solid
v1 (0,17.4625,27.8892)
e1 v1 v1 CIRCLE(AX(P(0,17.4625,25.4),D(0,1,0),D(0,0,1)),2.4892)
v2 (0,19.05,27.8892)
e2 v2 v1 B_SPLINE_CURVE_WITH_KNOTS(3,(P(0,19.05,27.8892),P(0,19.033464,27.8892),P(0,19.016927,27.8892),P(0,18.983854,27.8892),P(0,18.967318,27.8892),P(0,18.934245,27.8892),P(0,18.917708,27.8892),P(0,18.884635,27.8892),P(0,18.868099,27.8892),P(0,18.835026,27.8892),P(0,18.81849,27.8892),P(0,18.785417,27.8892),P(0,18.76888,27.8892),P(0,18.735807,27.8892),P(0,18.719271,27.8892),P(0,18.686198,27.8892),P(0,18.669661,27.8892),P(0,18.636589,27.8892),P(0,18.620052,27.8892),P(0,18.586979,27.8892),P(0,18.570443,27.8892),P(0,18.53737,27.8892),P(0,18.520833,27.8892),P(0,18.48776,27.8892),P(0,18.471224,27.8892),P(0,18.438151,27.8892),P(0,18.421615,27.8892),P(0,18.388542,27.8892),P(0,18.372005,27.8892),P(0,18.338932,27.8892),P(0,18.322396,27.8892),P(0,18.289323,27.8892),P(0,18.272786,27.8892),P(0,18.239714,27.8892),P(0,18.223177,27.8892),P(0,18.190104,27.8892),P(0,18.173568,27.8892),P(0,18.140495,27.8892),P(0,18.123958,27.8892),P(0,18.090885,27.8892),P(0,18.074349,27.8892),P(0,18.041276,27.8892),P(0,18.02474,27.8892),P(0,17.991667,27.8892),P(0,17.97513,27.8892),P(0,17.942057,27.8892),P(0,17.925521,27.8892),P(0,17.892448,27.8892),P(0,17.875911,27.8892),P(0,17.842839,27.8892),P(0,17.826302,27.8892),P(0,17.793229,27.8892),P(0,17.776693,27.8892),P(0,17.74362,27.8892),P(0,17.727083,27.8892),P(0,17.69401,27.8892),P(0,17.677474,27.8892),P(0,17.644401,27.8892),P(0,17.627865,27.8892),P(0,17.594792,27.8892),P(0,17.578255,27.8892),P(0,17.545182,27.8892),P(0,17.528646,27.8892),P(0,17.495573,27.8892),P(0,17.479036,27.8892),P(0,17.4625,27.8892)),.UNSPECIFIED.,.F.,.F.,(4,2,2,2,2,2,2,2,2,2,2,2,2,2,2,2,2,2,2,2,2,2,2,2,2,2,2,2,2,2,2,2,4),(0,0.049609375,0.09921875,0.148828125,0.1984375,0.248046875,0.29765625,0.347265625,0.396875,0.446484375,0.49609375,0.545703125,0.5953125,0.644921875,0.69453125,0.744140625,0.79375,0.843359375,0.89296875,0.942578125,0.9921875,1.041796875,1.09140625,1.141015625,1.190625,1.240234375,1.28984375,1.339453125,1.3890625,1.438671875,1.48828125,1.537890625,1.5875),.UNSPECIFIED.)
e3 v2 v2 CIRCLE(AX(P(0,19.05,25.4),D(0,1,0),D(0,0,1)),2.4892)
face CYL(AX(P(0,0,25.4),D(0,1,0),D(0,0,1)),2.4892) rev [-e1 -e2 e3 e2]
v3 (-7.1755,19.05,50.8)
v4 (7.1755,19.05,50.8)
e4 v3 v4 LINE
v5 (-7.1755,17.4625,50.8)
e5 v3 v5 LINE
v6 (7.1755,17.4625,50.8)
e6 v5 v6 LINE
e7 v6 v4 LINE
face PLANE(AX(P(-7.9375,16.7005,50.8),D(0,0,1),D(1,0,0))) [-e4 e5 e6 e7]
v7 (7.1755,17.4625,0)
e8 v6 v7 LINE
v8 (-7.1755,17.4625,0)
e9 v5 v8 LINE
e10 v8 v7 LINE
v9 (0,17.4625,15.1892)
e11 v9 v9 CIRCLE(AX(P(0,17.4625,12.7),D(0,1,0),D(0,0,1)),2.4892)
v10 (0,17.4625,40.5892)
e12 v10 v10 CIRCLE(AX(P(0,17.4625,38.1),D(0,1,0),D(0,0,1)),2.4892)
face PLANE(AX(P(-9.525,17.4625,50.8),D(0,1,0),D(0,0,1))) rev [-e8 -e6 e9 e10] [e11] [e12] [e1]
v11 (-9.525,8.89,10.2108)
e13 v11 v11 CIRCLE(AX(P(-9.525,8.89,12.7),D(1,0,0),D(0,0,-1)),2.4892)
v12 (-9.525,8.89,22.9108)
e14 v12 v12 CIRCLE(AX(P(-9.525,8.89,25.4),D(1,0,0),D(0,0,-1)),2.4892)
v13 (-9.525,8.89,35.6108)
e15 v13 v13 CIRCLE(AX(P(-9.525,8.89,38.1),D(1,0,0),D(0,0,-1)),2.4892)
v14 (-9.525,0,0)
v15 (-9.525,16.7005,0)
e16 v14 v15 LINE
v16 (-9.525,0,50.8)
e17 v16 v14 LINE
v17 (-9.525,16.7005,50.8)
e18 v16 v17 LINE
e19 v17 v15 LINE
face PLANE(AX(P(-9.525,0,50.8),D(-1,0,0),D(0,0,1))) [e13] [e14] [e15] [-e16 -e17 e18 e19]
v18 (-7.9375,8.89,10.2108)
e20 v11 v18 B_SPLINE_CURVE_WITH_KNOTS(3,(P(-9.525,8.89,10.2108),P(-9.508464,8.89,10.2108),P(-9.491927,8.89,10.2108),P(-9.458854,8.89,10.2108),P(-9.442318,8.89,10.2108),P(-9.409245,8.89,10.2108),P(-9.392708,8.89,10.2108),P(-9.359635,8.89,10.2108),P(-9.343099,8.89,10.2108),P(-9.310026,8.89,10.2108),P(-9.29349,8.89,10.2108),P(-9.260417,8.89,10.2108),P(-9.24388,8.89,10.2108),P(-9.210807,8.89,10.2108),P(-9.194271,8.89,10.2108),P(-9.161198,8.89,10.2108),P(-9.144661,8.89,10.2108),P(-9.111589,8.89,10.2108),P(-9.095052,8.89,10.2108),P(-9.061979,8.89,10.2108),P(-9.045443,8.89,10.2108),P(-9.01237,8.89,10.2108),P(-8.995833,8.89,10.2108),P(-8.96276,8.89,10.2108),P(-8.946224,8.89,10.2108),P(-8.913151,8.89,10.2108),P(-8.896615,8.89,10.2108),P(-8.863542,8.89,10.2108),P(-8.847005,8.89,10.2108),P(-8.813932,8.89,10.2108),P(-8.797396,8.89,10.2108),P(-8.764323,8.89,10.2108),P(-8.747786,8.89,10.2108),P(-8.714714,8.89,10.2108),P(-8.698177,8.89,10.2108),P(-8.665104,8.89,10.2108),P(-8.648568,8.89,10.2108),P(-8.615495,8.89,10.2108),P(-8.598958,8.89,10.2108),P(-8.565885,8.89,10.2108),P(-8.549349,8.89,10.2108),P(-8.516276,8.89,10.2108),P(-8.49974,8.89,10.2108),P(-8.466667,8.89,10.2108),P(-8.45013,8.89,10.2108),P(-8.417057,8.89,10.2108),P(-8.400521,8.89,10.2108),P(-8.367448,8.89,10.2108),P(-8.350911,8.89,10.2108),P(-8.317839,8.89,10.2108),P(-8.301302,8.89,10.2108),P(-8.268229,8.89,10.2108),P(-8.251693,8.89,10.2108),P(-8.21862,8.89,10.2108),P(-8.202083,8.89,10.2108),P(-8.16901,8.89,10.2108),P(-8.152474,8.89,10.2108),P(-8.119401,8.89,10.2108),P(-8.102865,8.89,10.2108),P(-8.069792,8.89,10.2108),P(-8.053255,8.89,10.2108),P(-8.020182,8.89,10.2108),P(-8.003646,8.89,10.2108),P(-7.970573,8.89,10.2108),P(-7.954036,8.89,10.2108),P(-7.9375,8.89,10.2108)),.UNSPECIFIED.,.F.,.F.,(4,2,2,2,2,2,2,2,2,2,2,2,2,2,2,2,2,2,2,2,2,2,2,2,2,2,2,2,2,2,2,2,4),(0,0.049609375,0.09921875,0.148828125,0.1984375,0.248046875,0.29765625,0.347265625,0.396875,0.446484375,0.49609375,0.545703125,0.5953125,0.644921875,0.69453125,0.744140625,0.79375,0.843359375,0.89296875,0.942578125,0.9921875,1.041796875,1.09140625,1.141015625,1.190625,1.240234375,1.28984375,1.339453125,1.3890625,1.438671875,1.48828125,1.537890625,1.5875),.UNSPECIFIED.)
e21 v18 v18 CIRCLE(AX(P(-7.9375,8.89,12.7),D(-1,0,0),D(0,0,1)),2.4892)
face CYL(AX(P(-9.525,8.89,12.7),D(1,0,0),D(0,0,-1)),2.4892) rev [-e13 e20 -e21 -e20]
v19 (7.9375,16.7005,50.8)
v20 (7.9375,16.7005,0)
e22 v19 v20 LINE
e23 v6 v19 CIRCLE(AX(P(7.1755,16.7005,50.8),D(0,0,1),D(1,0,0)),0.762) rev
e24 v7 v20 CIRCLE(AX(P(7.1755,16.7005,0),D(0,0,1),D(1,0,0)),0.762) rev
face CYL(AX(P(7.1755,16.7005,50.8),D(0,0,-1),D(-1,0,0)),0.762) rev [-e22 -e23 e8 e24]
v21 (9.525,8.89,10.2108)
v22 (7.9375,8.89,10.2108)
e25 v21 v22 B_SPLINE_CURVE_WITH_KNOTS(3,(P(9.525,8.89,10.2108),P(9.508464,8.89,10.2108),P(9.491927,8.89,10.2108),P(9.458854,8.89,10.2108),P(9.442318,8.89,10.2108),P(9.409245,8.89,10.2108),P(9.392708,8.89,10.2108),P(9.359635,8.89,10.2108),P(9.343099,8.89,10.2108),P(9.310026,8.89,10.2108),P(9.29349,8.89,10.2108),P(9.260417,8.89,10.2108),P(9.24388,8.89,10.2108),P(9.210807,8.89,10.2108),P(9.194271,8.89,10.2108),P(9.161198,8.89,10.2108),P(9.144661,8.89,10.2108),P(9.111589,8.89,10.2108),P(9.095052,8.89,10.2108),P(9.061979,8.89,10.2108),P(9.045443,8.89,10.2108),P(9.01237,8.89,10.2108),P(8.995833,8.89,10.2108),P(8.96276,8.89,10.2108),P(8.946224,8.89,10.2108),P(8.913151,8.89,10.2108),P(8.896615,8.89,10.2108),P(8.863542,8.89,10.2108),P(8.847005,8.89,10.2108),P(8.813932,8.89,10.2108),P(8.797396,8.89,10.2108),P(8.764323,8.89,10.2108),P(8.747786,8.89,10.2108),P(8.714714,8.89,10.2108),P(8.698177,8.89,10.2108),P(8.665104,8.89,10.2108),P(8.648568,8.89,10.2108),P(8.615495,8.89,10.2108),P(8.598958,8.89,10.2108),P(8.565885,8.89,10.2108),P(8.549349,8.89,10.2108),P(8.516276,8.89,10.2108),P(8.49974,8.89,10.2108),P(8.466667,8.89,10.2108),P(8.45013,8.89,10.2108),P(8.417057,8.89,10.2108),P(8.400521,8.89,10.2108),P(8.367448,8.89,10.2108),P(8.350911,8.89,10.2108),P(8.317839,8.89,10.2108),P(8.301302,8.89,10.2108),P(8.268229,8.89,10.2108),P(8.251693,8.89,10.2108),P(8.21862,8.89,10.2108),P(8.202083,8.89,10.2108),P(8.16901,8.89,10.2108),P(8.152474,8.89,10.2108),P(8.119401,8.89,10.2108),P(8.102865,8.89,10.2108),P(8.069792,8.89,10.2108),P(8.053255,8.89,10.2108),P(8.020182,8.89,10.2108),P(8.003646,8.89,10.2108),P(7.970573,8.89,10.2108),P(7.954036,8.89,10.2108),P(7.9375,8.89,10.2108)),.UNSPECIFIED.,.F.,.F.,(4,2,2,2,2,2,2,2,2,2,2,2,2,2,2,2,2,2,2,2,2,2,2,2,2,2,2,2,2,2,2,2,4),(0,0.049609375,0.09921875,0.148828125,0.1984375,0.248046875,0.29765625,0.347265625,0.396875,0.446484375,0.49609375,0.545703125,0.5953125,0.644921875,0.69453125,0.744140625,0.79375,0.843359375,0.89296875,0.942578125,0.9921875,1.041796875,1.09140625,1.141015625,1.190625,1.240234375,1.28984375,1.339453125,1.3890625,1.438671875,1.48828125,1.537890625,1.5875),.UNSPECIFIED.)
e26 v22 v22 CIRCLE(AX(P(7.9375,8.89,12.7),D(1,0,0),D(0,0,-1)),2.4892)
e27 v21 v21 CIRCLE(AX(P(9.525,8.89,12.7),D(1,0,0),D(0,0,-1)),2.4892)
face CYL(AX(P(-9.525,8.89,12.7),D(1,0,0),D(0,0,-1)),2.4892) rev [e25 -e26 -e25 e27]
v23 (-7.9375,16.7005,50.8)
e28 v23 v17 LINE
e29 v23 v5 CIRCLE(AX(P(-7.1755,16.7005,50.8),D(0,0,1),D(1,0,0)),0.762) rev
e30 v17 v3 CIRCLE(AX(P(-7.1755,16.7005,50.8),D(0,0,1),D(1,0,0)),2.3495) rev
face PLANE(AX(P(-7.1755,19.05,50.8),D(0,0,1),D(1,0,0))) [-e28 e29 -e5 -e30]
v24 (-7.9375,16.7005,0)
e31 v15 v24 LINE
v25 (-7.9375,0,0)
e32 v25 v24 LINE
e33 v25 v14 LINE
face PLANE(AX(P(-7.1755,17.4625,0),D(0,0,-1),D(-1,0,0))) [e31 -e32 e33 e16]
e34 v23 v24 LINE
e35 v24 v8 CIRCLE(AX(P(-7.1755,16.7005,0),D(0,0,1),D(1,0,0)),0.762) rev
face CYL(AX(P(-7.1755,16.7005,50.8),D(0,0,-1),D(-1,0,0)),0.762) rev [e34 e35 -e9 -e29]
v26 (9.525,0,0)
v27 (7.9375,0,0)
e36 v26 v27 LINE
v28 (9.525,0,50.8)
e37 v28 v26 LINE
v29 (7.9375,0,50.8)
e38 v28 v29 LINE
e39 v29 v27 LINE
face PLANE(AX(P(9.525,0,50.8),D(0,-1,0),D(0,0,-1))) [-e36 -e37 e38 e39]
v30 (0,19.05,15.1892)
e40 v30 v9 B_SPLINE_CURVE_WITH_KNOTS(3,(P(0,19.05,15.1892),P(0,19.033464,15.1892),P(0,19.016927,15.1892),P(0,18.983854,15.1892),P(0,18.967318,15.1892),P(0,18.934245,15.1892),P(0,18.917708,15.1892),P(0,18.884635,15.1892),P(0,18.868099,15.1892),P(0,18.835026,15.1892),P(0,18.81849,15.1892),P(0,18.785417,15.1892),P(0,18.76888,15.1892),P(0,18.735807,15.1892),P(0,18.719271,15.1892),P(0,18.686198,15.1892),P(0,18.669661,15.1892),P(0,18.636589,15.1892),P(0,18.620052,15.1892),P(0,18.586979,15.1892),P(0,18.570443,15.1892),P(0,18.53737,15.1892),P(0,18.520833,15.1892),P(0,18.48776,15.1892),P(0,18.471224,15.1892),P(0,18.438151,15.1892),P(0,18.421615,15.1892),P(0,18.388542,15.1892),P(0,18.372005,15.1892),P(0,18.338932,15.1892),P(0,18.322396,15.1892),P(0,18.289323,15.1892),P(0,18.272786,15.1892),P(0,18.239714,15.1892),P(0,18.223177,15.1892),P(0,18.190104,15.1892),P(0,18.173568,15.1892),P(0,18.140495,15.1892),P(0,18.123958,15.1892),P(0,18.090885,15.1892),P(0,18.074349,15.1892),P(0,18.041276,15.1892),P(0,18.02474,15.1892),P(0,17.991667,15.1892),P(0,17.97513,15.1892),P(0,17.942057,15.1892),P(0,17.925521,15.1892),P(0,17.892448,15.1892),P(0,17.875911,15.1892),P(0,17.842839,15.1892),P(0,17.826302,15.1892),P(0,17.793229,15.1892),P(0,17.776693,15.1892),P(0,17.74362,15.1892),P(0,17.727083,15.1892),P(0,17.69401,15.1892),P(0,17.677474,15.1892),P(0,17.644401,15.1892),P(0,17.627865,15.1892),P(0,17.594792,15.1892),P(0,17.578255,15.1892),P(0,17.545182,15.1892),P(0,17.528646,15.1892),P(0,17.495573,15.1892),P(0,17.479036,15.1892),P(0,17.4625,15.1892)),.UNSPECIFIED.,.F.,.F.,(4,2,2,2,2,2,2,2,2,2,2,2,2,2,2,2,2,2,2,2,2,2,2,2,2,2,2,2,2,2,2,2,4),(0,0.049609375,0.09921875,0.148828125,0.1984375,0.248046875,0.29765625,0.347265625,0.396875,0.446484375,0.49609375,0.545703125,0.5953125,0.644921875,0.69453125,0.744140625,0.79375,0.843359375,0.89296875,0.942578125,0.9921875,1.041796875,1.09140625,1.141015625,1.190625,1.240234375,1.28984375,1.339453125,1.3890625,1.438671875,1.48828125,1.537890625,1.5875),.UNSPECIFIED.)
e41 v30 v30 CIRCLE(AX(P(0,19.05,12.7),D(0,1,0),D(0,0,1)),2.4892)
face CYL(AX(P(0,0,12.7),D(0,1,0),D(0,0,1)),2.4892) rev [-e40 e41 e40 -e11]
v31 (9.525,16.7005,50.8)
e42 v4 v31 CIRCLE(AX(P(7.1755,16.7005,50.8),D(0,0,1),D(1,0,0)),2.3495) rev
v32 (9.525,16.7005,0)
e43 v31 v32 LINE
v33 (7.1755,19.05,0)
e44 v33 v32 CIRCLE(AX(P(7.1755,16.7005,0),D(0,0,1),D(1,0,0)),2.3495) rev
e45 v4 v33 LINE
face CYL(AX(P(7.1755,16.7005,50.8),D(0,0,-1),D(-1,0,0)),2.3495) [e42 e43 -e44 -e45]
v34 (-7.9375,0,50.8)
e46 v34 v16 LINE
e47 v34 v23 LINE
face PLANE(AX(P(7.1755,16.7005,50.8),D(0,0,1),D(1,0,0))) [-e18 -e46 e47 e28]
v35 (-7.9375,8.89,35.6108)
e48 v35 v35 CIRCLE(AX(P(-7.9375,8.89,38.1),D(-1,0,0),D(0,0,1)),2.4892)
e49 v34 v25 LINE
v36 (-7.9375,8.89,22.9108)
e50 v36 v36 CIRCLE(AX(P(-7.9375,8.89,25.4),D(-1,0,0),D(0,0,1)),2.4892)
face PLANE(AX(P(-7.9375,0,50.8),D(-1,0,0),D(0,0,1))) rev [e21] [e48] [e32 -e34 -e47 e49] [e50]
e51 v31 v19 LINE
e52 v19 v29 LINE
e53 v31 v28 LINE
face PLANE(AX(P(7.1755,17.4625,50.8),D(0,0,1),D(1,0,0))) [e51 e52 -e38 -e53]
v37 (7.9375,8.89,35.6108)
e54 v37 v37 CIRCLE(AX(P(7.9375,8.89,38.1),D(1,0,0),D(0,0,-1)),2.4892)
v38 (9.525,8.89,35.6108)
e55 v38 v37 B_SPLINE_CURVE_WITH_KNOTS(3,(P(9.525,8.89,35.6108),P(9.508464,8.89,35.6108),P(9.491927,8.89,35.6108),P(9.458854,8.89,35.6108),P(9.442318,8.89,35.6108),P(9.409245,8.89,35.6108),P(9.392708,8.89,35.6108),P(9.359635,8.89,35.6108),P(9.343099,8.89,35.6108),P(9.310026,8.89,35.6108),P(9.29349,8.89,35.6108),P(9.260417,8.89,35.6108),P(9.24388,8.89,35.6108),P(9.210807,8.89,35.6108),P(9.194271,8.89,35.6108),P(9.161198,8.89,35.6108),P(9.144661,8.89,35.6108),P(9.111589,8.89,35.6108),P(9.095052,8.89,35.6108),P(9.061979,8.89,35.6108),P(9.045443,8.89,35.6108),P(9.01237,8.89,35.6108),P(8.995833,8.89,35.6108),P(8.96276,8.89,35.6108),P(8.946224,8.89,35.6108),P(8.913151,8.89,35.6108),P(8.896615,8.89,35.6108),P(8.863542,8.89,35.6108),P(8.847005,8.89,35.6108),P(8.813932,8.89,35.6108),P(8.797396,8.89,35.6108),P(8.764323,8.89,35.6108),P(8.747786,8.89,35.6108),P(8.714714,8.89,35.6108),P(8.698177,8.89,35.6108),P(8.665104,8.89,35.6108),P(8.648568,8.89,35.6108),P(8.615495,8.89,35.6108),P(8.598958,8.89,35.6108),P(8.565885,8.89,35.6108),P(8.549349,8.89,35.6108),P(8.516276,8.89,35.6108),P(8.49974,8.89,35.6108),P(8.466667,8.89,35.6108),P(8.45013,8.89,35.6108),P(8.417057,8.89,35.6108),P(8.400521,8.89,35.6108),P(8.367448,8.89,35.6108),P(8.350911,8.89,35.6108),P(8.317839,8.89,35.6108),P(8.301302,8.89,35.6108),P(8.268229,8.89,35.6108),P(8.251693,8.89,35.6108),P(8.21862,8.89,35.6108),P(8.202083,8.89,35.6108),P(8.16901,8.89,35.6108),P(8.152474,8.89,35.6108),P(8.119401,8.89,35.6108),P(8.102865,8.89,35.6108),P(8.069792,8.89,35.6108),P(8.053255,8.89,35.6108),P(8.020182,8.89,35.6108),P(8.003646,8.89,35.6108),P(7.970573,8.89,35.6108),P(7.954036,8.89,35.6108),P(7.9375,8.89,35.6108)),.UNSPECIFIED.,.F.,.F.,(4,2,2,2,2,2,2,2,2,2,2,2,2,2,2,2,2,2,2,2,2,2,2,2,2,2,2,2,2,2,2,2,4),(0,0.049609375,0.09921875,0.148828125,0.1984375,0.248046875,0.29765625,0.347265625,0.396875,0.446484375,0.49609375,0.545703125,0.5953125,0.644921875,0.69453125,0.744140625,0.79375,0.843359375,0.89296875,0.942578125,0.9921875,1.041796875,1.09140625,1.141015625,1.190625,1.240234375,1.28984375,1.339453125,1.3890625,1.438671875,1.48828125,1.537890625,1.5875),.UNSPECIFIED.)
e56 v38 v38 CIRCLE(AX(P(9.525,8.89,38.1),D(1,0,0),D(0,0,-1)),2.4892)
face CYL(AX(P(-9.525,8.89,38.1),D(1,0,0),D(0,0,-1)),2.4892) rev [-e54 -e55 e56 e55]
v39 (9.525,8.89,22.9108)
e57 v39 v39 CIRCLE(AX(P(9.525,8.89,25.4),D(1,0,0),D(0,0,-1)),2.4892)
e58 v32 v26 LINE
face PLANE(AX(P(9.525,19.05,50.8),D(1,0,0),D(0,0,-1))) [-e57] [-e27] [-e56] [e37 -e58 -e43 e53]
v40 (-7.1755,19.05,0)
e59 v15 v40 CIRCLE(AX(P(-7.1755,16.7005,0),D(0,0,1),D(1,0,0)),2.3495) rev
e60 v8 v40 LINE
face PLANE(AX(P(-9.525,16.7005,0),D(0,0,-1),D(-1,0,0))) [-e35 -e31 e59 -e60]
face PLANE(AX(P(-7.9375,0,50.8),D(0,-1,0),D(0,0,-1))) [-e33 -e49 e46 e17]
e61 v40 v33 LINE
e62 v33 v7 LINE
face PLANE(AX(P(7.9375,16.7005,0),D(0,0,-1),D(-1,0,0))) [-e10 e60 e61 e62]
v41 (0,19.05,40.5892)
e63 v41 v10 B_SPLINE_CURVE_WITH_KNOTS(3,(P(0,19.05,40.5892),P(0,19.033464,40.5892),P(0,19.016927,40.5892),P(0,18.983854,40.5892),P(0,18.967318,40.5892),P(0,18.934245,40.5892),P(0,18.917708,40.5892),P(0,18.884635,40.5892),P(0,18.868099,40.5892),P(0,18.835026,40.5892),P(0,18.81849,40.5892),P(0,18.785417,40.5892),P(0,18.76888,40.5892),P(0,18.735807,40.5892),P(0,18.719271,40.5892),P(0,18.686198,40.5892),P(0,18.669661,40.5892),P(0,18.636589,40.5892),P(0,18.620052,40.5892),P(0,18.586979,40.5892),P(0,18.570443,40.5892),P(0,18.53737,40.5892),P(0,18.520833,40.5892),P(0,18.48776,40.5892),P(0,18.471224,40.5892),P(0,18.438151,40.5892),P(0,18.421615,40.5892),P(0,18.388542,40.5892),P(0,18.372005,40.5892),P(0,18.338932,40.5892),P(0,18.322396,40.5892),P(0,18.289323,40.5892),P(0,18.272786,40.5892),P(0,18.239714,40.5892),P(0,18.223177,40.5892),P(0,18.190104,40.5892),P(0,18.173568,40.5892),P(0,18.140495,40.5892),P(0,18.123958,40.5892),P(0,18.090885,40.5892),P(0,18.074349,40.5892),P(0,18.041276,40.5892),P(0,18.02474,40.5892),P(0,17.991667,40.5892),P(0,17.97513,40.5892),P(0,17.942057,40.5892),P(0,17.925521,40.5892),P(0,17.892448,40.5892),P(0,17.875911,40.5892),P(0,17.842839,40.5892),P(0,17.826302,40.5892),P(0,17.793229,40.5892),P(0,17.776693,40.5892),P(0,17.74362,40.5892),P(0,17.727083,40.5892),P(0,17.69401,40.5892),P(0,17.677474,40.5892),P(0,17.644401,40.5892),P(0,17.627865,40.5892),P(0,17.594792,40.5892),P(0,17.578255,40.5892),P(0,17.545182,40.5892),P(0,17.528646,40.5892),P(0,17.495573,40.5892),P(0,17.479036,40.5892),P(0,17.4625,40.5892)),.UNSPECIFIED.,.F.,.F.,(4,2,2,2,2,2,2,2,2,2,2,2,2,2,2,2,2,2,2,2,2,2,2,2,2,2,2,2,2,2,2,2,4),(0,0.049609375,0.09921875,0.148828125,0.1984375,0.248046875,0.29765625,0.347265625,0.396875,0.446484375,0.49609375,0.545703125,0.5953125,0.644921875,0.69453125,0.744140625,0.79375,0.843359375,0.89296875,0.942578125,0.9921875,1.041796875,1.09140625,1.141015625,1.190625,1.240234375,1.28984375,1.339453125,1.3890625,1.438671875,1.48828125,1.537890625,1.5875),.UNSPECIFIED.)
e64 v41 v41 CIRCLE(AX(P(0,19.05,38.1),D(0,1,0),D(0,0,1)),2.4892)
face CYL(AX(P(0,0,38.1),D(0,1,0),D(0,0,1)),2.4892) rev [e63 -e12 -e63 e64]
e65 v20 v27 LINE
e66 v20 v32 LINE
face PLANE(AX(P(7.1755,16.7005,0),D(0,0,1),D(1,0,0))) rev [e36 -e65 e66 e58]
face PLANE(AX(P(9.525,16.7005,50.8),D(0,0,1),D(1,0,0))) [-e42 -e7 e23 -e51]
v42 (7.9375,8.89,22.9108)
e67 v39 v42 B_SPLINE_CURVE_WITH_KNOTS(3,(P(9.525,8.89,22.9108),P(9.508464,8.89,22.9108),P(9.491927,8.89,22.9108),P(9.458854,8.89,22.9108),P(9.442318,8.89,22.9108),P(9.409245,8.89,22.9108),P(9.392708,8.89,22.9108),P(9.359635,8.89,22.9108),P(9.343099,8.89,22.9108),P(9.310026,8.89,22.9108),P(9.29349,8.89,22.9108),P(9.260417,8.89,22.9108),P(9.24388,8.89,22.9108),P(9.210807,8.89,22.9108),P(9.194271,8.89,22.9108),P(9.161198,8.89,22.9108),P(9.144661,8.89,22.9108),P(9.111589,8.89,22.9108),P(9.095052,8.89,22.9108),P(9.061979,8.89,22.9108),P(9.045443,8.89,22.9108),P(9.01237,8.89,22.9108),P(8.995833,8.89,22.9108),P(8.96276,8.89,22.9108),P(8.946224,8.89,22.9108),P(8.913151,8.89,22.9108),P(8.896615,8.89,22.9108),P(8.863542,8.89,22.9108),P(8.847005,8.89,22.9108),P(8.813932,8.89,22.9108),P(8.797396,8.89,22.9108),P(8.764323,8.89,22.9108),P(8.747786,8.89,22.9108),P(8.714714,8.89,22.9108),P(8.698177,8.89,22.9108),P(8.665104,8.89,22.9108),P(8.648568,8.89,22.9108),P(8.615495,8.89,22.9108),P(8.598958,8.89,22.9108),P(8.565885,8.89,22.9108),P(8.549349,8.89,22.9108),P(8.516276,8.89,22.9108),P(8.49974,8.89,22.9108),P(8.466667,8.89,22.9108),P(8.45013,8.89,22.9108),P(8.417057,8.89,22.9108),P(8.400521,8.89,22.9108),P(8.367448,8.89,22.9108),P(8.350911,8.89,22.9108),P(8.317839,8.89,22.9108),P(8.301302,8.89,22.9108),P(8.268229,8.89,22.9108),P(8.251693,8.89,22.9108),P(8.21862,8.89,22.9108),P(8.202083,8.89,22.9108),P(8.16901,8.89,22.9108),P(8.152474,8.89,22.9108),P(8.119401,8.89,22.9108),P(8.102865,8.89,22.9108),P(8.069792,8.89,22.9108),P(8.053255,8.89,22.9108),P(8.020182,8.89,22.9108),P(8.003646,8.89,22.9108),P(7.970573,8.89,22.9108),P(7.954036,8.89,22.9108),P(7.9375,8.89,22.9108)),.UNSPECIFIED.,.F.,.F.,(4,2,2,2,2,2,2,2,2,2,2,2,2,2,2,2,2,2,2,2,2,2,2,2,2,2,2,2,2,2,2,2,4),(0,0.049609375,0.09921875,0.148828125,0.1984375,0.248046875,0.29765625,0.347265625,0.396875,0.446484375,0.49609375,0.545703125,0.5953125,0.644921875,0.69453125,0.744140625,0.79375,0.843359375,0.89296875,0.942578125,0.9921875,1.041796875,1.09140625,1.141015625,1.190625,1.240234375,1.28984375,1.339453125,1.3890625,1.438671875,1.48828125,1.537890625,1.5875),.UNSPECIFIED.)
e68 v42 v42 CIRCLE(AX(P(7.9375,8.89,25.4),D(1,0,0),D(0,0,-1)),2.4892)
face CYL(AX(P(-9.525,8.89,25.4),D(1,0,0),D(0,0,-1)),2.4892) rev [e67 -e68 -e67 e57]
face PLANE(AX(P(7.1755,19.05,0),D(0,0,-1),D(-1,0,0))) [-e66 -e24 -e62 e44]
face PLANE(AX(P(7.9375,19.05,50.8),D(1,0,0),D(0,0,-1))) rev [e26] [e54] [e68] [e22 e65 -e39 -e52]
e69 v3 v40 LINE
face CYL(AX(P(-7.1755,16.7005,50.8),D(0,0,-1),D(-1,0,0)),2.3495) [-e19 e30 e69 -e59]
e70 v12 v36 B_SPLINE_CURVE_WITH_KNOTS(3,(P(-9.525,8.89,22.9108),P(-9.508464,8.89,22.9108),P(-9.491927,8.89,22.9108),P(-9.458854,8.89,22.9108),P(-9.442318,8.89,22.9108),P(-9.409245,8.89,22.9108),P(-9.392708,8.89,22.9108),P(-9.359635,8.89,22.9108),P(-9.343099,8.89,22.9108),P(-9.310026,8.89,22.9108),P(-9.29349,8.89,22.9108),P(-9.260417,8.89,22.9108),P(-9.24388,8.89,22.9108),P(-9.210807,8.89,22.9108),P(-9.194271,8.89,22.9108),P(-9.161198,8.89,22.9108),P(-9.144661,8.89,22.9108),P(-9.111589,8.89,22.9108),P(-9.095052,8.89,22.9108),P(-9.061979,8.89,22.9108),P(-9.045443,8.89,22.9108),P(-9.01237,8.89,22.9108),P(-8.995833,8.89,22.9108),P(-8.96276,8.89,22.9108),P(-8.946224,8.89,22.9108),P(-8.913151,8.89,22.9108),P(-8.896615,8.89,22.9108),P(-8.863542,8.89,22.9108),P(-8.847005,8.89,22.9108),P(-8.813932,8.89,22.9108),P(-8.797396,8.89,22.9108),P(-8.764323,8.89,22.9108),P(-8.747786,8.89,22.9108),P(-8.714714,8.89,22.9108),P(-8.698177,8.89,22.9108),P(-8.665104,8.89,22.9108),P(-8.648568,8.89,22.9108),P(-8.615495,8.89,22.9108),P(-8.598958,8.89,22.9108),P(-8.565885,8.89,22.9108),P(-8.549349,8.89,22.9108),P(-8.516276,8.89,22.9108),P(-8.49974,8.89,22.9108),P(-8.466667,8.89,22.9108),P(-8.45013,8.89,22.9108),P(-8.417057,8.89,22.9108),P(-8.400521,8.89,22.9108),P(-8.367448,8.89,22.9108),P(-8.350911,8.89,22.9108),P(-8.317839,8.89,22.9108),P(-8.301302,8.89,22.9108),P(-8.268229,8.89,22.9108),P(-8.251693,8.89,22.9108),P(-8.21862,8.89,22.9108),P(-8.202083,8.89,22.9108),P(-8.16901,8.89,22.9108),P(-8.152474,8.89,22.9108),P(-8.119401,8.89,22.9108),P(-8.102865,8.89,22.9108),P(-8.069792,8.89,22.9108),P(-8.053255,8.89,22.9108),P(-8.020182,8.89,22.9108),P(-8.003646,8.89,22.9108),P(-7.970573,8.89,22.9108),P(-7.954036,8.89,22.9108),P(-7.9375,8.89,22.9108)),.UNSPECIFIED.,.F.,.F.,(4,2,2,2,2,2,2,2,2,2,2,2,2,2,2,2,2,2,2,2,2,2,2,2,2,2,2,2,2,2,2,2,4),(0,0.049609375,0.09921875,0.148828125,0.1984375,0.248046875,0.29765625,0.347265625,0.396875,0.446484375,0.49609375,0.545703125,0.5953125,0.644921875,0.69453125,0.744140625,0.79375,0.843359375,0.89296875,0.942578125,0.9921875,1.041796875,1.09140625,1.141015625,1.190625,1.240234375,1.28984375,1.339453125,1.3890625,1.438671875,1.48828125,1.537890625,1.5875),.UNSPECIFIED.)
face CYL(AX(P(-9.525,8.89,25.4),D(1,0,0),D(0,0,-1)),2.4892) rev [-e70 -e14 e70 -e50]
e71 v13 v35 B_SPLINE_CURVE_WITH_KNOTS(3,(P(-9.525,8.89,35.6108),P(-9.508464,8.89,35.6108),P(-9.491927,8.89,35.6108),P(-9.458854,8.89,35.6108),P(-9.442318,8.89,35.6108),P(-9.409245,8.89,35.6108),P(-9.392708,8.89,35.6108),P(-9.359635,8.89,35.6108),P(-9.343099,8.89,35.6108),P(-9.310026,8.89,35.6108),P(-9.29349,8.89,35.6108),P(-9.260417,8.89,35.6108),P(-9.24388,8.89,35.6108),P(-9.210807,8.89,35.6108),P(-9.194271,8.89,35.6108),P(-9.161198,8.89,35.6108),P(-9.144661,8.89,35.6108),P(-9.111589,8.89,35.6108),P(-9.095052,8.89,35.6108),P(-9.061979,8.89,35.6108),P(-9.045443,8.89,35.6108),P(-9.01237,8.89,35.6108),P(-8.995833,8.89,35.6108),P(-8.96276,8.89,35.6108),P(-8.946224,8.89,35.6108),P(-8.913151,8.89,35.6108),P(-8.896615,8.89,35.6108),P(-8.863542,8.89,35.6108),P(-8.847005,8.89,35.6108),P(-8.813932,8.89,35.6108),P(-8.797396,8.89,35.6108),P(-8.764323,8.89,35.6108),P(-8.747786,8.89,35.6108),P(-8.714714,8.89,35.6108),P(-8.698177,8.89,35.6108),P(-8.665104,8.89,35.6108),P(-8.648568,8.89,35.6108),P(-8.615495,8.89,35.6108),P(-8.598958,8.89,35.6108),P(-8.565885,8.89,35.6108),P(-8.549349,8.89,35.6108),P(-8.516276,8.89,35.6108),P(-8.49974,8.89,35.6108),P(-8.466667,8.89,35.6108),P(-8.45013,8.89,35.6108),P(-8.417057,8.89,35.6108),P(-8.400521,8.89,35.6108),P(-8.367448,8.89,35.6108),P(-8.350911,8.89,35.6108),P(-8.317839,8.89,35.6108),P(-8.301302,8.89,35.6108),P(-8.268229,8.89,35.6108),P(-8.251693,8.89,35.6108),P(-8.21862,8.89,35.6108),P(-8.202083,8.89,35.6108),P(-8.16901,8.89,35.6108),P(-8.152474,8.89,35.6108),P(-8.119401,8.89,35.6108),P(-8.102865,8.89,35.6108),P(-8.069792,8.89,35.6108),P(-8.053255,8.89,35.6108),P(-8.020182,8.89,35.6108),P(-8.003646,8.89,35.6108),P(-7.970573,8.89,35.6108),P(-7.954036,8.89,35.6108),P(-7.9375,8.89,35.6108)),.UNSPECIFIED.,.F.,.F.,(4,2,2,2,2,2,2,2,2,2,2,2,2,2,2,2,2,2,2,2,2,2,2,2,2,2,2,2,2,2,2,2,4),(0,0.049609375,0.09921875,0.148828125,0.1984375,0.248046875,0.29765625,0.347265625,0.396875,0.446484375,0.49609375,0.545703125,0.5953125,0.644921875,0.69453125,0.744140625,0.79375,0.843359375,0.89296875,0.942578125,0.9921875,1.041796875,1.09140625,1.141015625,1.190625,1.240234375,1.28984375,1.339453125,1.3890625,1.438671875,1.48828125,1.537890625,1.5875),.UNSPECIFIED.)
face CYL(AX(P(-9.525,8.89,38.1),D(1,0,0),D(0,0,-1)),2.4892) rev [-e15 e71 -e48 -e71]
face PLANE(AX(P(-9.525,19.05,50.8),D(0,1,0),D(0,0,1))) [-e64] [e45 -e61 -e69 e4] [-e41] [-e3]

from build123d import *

# Parameters (mm, degrees)
BASE_FLANGE1_DEPTH = 50.8
SKETCH6_R          = 2.4892
CUT_EXTRUDE1_DEPTH = 56.084191244
SKETCH7_R          = 2.4892
CUT_EXTRUDE2_DEPTH = 58.501695627


# Sheet-metal steps are written as plain solids
with BuildPart() as part:
    # Sketch1 → Base-Flange1 (new body)
    with BuildSketch(Plane.XY):
        with BuildLine():
            Line((-9.525, 0), (-9.525, 16.7005))
            ThreePointArc((-9.525, 16.7005), (-8.836847382, 18.361847382), (-7.1755, 19.05))
            Line((-7.1755, 19.05), (7.1755, 19.05))
            ThreePointArc((7.1755, 19.05), (8.836847382, 18.361847382), (9.525, 16.7005))
            Line((9.525, 16.7005), (9.525, 0))
            Line((9.525, 0), (7.9375, 0))
            Line((7.9375, 0), (7.9375, 16.7005))
            ThreePointArc((7.9375, 16.7005), (7.714315367, 17.239315367), (7.1755, 17.4625))
            Line((7.1755, 17.4625), (-7.1755, 17.4625))
            ThreePointArc((-7.1755, 17.4625), (-7.714315367, 17.239315367), (-7.9375, 16.7005))
            Line((-7.9375, 16.7005), (-7.9375, 0))
            Line((-7.9375, 0), (-9.525, 0))
        make_face()
    extrude(amount=BASE_FLANGE1_DEPTH)

    # Sketch6 → Cut-Extrude1 (cut, through all)
    with BuildSketch(Plane(origin=(0, 19.05, 0), x_dir=(1, 0, 0), z_dir=(0, 1, 0))):
        with Locations(Location((0, -12.7, 0), (0, 0, 270))):
            Circle(SKETCH6_R)
        with Locations(Location((0, -25.4, 0), (0, 0, 270))):
            Circle(SKETCH6_R)
        with Locations(Location((0, -38.1, 0), (0, 0, 270))):
            Circle(SKETCH6_R)
    extrude(amount=-CUT_EXTRUDE1_DEPTH, mode=Mode.SUBTRACT)

    # Sketch7 → Cut-Extrude2 (cut, through all)
    with BuildSketch(Plane(origin=(9.525, 0, 0), x_dir=(0, 0, -1), z_dir=(1, 0, 0))):
        with Locations((-25.4, 8.89)):
            Circle(SKETCH7_R)
        with Locations((-12.7, 8.89)):
            Circle(SKETCH7_R)
        with Locations((-38.1, 8.89)):
            Circle(SKETCH7_R)
    extrude(amount=-CUT_EXTRUDE2_DEPTH, mode=Mode.SUBTRACT)


solid = part.part
